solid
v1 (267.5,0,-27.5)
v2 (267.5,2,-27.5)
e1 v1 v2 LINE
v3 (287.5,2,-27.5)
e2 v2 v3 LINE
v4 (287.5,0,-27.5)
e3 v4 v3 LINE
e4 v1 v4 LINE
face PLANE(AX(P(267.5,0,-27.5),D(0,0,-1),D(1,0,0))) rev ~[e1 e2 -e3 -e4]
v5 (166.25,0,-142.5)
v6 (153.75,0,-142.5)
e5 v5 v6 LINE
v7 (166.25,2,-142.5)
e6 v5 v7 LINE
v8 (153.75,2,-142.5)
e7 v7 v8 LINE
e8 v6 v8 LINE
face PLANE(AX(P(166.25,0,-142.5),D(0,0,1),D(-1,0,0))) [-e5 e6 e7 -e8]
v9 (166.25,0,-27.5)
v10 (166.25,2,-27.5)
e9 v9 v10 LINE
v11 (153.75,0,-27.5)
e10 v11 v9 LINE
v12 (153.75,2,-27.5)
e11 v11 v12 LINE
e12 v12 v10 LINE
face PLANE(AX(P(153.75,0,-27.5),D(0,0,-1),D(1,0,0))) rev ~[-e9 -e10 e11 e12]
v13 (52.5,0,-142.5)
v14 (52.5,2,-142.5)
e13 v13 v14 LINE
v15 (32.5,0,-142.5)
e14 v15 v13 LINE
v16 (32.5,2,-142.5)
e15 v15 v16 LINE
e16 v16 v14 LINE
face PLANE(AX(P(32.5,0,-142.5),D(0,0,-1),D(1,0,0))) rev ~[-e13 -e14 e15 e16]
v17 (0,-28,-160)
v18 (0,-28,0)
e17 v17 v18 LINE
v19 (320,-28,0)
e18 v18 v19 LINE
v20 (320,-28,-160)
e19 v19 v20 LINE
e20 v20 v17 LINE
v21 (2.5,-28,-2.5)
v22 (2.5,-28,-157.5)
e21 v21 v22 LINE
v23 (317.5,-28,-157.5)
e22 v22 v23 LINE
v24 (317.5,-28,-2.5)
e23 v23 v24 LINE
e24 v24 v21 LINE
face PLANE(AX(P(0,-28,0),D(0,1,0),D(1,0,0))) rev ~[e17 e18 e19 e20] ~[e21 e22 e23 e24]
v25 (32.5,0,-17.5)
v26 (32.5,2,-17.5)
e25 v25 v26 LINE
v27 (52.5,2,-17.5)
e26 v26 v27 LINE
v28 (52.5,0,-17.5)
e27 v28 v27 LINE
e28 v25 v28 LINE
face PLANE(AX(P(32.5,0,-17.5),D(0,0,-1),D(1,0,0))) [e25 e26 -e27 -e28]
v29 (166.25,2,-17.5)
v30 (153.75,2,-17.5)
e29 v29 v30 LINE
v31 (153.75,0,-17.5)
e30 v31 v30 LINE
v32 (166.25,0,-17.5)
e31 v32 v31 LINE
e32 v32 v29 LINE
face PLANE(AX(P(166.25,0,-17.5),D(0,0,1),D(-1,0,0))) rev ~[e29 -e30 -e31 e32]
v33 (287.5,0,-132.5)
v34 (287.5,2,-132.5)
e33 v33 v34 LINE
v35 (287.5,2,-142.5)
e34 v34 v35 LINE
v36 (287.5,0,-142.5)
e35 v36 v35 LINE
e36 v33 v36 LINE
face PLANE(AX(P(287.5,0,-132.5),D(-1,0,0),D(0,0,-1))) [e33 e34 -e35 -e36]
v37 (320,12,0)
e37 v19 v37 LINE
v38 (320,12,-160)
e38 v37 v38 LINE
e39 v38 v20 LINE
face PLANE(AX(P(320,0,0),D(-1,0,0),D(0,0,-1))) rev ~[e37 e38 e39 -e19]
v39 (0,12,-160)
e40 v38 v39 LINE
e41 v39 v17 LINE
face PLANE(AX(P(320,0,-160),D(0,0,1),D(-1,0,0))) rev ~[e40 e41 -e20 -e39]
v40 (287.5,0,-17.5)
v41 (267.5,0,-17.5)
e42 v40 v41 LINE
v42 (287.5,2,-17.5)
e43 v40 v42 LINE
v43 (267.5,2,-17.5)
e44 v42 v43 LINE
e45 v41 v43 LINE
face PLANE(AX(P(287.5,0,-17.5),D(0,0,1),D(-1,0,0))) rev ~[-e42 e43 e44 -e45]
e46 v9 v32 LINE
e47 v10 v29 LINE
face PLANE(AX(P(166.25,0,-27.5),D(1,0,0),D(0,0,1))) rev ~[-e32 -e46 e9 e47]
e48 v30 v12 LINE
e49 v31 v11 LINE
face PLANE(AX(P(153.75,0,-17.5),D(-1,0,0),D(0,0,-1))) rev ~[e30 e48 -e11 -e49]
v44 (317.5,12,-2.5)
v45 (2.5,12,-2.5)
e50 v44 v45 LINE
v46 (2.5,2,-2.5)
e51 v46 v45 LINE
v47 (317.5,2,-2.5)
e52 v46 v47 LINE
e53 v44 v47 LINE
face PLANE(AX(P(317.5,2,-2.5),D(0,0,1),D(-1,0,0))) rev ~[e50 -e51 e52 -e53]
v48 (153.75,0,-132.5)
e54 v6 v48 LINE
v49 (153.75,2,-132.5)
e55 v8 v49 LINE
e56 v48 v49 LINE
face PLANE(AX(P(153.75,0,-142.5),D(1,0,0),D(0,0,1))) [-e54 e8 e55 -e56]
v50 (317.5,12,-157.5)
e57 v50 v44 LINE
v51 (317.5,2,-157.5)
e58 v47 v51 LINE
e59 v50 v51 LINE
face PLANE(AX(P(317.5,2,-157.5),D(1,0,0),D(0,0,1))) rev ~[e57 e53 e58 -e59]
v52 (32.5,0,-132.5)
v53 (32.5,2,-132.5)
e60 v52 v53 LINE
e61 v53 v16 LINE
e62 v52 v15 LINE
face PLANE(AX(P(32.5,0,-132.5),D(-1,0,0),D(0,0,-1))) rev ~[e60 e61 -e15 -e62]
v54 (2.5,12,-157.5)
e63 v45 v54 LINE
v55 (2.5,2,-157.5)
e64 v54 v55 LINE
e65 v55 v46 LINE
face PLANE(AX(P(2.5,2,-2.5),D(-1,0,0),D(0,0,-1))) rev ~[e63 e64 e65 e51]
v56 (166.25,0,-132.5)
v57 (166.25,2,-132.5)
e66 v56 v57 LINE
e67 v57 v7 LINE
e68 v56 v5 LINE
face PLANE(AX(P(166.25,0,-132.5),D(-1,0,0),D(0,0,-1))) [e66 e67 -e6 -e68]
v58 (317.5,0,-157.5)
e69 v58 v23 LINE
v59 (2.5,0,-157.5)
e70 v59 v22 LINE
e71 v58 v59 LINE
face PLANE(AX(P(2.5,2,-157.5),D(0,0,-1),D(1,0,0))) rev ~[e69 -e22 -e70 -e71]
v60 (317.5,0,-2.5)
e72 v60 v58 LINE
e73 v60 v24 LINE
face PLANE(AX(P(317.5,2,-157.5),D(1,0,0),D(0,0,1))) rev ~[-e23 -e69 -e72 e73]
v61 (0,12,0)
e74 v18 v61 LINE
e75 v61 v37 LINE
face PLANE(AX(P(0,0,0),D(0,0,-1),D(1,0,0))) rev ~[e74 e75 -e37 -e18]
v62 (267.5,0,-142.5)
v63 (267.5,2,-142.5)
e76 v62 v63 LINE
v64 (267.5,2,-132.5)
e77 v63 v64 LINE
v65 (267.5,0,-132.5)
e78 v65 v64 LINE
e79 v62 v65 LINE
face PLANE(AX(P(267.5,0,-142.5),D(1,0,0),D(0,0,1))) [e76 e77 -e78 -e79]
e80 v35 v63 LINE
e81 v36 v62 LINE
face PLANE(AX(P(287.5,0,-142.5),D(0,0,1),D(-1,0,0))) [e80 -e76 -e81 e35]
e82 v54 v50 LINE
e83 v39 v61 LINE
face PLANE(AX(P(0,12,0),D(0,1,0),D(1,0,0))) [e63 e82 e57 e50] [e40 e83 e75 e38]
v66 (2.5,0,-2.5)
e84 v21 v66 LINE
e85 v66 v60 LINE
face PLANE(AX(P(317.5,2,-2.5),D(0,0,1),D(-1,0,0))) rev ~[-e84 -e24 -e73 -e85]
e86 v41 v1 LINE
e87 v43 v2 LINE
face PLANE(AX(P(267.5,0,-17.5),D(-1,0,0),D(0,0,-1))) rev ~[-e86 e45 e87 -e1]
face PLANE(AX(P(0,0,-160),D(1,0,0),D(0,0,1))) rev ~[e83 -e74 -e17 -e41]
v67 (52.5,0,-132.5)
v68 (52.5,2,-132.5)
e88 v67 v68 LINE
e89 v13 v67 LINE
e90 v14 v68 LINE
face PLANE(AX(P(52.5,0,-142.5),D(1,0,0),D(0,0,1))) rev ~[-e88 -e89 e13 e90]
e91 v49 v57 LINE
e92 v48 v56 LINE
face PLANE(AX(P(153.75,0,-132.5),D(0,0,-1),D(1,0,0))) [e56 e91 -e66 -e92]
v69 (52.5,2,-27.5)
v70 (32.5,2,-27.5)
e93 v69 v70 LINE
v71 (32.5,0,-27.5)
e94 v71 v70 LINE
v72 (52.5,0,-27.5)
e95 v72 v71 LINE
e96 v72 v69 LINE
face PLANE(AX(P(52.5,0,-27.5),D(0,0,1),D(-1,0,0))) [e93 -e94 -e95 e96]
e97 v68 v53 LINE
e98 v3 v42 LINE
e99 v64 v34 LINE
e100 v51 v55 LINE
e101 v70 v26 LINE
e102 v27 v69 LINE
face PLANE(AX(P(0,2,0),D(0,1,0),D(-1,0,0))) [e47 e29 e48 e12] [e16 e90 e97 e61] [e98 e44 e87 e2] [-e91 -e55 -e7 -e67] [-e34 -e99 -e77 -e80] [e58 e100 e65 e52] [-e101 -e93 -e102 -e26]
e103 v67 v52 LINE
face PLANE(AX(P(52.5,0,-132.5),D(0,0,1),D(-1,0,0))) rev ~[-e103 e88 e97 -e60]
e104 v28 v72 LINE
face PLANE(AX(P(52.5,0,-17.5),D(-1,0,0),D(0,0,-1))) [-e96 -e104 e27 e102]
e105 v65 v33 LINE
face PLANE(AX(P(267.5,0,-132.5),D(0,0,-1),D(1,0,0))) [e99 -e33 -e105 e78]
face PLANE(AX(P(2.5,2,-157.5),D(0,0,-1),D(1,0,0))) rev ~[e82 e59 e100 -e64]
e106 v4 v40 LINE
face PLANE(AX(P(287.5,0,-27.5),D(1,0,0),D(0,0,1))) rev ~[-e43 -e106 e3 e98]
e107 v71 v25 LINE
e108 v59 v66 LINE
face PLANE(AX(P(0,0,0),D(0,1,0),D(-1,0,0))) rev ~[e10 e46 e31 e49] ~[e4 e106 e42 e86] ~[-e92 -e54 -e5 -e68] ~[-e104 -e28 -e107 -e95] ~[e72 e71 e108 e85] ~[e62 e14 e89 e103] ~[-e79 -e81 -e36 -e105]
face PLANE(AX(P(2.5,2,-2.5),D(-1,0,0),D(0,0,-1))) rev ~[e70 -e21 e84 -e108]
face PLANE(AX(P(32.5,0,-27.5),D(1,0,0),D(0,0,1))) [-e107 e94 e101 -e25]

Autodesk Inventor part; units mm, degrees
ref_plane "YZ Plane" through (0, 0, 0) normal (1, 0, 0) x (0, 1, 0)
ref_plane "XZ Plane" through (0, 0, 0) normal (0, 1, 0) x (-1, 0, 0)
ref_plane "XY Plane" through (0, 0, 0) normal (0, 0, 1) x (1, 0, 0)
sketch "Sketch1" plane through (0, 0, 0) normal (0, 1, 0) x (-1, 0, 0)
  line L0 (0, 0) -> (-320, 0)
  line L1 (-320, 0) -> (-320, -160)
  line L2 (-320, -160) -> (0, -160)
  line L3 (0, -160) -> (0, 0)
  line L4 (-2.5, -157.5) -> (-317.5, -157.5)
  line L5 (-317.5, -157.5) -> (-317.5, -2.5)
  line L6 (-317.5, -2.5) -> (-2.5, -2.5)
  line L7 (-2.5, -2.5) -> (-2.5, -157.5)
  line L8 (-32.5, -142.5) -> (-52.5, -142.5)
  line L9 (-52.5, -142.5) -> (-52.5, -132.5)
  line L10 (-52.5, -132.5) -> (-32.5, -132.5)
  line L11 (-32.5, -132.5) -> (-32.5, -142.5)
  line L12 (-287.5, -142.5) -> (-267.5, -142.5)
  line L13 (-267.5, -142.5) -> (-267.5, -132.5)
  line L14 (-267.5, -132.5) -> (-287.5, -132.5)
  line L15 (-287.5, -132.5) -> (-287.5, -142.5)
  line L16 (-166.25, -142.5) -> (-153.75, -142.5)
  line L17 (-153.75, -142.5) -> (-153.75, -132.5)
  line L18 (-153.75, -132.5) -> (-166.25, -132.5)
  line L19 (-166.25, -132.5) -> (-166.25, -142.5)
  line L20 (-2.5, -80) -> (-317.5, -80)
  line L21 (-32.5, -17.5) -> (-52.5, -17.5)
  line L22 (-52.5, -17.5) -> (-52.5, -27.5)
  line L23 (-52.5, -27.5) -> (-32.5, -27.5)
  line L24 (-32.5, -27.5) -> (-32.5, -17.5)
  line L25 (-287.5, -17.5) -> (-267.5, -17.5)
  line L26 (-267.5, -17.5) -> (-267.5, -27.5)
  line L27 (-267.5, -27.5) -> (-287.5, -27.5)
  line L28 (-287.5, -27.5) -> (-287.5, -17.5)
  line L29 (-166.25, -17.5) -> (-153.75, -17.5)
  line L30 (-153.75, -17.5) -> (-153.75, -27.5)
  line L31 (-153.75, -27.5) -> (-166.25, -27.5)
  line L32 (-166.25, -27.5) -> (-166.25, -17.5)
  point P0 (-32.5, -137.5)
  point P1 (-42.5, -142.5)
  point P2 (-277.5, -142.5)
  point P3 (-287.5, -137.5)
  point P4 (-52.5, -137.5)
  point P5 (-267.5, -137.5)
  point P6 (-160, -142.5)
  point P7 (-32.5, -22.5)
  point P8 (-42.5, -17.5)
  point P9 (-277.5, -17.5)
  point P10 (-287.5, -22.5)
  point P11 (-52.5, -22.5)
  point P12 (-267.5, -22.5)
  point P13 (-160, -17.5)
  dimension "d0" = 320
  dimension "d1" = 160
  dimension "d2" = 2.5
  dimension "d7" = 30
  dimension "d8" = 15
  dimension "d9" = 20
  dimension "d10" = 10
  dimension "d11" = 20
  dimension "d12" = 10
  dimension "d13" = 15
  dimension "d14" = 30
  dimension "d16" = 215
  dimension "d18" = 10
  dimension "d19" = 12.5
  dimension "d23" = 160
  dimension "d25" = 15
extrude "Extrusion1" add sketch "Sketch1" along normal blind 2 contours L3 L2 L1 L0 | L4 L5 L20 L7 | L20 L5 L6 L7
sketch "Sketch2" plane through (0, 2, 0) normal (0, 1, 0) x (1, 0, 0)
  line L0 (320, 0) -> (320, 160) projected
  line L1 (320, 160) -> (0, 160) projected
  line L2 (0, 160) -> (0, 0) projected
  line L3 (0, 0) -> (320, 0) projected
  line L4 (32.5, 142.5) -> (52.5, 142.5) projected
  line L5 (52.5, 142.5) -> (52.5, 132.5) projected
  line L6 (52.5, 132.5) -> (32.5, 132.5) projected
  line L7 (32.5, 132.5) -> (32.5, 142.5) projected
  line L8 (287.5, 142.5) -> (287.5, 132.5) projected
  line L9 (287.5, 132.5) -> (267.5, 132.5) projected
  line L10 (267.5, 132.5) -> (267.5, 142.5) projected
  line L11 (267.5, 142.5) -> (287.5, 142.5) projected
  line L12 (166.25, 142.5) -> (166.25, 132.5) projected
  line L13 (166.25, 132.5) -> (153.75, 132.5) projected
  line L14 (153.75, 132.5) -> (153.75, 142.5) projected
  line L15 (153.75, 142.5) -> (166.25, 142.5) projected
  line L16 (52.5, 17.5) -> (32.5, 17.5) projected
  line L17 (32.5, 17.5) -> (32.5, 27.5) projected
  line L18 (32.5, 27.5) -> (52.5, 27.5) projected
  line L19 (52.5, 27.5) -> (52.5, 17.5) projected
  line L20 (267.5, 17.5) -> (267.5, 27.5) projected
  line L21 (267.5, 27.5) -> (287.5, 27.5) projected
  line L22 (287.5, 27.5) -> (287.5, 17.5) projected
  line L23 (287.5, 17.5) -> (267.5, 17.5) projected
  line L24 (166.25, 27.5) -> (166.25, 17.5) projected
  line L25 (166.25, 17.5) -> (153.75, 17.5) projected
  line L26 (153.75, 17.5) -> (153.75, 27.5) projected
  line L27 (153.75, 27.5) -> (166.25, 27.5) projected
  line L28 (2.5, 2.5) -> (2.5, 157.5)
  line L29 (2.5, 157.5) -> (317.5, 157.5)
  line L30 (317.5, 157.5) -> (317.5, 2.5)
  line L31 (317.5, 2.5) -> (2.5, 2.5)
  dimension "d26" = 2.5
extrude "Extrusion2" add sketch "Sketch2" along normal blind 10 and the other way blind 30 contours L3 L2 L1 L0
sketch "Sketch3" plane through (0, -28, 0) normal (0, -1, 0) x (1, 0, 0)
  line L0 (0, 0) -> (0, -160) projected
  line L1 (0, -160) -> (320, -160) projected
  line L2 (320, -160) -> (320, 0) projected
  line L3 (320, 0) -> (0, 0) projected
properties part number "led_spectrum_frame"
